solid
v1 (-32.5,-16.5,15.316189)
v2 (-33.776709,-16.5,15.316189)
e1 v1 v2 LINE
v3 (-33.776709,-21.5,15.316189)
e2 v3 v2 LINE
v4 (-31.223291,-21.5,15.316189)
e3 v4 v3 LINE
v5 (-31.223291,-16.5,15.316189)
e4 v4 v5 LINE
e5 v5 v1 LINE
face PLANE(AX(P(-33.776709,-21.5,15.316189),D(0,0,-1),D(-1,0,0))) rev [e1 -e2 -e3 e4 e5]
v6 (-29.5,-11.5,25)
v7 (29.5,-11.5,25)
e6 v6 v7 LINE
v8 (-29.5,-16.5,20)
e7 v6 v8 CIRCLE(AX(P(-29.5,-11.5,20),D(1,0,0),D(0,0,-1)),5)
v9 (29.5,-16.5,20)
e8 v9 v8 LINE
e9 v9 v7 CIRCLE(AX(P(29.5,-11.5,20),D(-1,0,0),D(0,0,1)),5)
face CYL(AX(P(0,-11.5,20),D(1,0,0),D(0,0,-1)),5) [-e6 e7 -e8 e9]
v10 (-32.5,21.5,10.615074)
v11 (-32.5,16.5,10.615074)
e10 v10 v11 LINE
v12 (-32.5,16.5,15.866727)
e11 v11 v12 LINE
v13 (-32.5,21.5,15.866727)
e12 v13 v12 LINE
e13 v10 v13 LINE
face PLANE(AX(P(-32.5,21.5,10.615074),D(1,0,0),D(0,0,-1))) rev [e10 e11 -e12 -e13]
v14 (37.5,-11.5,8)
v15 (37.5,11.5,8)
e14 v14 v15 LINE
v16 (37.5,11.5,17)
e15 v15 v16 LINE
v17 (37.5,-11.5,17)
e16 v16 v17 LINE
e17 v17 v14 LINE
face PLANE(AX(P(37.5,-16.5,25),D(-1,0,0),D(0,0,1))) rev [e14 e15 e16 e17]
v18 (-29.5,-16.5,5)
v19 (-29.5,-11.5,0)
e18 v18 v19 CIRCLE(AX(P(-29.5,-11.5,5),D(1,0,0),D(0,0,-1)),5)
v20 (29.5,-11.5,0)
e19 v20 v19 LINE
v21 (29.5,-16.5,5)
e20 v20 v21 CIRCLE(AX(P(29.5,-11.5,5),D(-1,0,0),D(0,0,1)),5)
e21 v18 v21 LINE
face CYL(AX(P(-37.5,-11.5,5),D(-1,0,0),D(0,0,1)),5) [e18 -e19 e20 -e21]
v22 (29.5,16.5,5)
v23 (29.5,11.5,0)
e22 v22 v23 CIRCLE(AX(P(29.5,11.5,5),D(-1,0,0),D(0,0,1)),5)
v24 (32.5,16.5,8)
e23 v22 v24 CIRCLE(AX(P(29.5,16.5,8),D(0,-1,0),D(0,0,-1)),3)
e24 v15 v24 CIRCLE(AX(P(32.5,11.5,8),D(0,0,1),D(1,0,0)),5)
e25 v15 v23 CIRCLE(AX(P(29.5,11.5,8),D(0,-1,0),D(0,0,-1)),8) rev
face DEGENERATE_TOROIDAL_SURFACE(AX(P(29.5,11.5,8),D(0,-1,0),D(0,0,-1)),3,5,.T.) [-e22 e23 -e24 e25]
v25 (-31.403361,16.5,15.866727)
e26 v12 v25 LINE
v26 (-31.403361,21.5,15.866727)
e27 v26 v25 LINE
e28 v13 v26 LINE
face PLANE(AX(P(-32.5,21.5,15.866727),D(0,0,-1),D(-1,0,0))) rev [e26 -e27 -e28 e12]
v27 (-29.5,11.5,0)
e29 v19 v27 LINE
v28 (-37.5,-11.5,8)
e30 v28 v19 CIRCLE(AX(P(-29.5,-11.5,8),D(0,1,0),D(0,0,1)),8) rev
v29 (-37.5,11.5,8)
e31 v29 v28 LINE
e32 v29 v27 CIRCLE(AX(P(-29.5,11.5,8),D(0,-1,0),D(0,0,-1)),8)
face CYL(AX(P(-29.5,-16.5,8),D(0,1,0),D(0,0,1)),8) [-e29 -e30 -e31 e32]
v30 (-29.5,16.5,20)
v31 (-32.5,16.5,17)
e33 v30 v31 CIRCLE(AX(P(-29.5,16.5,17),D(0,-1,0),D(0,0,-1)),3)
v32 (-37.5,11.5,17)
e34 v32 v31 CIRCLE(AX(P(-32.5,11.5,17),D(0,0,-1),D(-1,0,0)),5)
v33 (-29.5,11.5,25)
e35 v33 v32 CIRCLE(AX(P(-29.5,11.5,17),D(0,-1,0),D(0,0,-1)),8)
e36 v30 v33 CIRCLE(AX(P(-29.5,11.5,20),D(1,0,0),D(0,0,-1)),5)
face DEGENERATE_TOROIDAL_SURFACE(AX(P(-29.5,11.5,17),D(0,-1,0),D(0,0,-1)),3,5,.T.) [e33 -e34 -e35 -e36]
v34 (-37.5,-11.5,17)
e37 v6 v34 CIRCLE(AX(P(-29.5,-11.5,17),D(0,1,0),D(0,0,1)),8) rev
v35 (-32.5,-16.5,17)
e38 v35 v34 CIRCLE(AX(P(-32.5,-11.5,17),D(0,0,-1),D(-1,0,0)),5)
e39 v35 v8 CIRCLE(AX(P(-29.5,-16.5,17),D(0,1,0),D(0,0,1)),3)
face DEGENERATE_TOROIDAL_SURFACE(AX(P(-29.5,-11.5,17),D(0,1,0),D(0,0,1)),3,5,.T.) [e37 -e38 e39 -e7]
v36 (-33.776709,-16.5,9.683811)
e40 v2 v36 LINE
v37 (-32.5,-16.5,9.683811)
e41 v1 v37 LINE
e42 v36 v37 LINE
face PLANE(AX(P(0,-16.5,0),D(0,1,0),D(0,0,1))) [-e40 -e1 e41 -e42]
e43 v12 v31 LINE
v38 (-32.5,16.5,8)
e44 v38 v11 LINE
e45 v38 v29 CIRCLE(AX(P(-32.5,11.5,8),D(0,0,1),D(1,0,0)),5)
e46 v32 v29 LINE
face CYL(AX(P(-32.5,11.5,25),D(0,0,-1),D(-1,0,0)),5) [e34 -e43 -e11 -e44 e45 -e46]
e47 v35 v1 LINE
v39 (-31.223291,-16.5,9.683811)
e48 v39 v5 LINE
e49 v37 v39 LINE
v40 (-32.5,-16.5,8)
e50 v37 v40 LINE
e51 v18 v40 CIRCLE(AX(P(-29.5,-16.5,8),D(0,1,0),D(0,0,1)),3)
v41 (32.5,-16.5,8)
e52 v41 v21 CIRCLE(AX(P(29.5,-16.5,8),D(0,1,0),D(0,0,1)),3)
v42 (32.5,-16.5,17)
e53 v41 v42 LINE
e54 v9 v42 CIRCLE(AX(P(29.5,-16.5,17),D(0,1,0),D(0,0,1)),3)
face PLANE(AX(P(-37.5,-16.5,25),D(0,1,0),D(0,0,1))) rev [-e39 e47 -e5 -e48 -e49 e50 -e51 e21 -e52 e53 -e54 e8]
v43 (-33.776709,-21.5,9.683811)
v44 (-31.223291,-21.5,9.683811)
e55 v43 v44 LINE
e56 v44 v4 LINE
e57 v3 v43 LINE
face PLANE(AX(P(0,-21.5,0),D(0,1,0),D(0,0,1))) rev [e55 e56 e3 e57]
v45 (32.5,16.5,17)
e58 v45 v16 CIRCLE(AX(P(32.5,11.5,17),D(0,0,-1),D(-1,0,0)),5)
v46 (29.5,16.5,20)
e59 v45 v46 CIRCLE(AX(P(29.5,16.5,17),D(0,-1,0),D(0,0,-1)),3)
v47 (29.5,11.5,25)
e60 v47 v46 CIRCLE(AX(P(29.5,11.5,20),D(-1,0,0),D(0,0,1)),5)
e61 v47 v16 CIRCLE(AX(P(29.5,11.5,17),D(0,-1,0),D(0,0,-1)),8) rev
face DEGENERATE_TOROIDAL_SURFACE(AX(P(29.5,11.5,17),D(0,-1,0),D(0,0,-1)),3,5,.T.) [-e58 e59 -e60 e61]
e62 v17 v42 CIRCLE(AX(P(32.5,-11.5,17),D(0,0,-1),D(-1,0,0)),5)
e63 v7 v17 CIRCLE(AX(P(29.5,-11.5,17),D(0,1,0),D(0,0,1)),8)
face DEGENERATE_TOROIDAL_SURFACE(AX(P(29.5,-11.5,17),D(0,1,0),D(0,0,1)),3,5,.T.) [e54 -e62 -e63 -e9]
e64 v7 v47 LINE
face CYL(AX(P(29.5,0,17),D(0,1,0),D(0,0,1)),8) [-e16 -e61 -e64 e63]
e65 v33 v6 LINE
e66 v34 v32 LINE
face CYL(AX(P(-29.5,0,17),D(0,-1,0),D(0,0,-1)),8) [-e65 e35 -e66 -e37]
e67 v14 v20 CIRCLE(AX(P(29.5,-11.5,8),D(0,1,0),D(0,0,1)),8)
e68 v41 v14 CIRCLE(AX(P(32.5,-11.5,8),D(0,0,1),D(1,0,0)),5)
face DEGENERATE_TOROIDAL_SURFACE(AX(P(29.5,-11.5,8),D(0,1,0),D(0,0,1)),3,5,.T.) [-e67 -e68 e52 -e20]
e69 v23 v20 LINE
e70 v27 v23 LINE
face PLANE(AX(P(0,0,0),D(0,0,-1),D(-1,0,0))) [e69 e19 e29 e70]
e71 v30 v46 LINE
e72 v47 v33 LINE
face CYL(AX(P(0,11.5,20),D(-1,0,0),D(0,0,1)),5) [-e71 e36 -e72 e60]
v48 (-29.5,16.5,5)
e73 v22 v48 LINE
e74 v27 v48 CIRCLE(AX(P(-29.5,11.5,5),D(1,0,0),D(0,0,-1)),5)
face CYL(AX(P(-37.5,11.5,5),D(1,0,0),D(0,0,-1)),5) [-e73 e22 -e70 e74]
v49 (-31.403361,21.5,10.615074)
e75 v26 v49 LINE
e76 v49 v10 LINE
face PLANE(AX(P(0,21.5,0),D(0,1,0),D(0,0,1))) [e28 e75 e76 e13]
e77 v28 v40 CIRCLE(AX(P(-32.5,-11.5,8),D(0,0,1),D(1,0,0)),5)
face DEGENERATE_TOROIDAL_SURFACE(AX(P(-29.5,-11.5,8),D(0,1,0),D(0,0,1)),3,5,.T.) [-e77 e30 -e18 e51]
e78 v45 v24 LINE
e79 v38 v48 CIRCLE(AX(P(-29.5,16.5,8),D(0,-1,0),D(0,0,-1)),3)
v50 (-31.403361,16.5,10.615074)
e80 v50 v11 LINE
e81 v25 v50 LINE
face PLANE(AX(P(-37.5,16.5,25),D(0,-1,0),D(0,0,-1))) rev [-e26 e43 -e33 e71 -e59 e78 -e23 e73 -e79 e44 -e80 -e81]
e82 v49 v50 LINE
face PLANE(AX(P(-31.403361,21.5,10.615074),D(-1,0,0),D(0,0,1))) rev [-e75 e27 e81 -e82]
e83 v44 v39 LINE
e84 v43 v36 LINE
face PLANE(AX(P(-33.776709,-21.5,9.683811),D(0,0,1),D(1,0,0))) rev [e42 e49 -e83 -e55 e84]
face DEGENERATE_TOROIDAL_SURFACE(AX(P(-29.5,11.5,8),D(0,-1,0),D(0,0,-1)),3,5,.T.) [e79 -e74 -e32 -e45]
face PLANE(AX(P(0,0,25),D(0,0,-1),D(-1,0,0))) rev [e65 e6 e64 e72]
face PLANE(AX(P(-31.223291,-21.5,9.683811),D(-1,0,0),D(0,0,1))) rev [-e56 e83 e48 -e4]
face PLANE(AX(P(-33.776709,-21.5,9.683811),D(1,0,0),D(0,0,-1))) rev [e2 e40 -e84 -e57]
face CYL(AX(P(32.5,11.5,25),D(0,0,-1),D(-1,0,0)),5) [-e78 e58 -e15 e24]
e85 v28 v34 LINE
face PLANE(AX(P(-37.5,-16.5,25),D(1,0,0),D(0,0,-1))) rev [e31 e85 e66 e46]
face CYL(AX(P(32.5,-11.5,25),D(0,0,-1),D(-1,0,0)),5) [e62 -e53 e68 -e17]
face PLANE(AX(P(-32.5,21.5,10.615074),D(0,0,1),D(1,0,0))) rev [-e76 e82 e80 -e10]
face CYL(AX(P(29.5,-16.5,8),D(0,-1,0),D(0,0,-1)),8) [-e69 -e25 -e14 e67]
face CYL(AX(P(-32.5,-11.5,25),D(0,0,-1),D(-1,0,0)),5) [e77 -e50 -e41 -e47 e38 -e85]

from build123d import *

# Parameters (mm, degrees)
SKETCH1_W           = 75
SKETCH1_H           = 33
BOSS_EXTRUDE1_DEPTH = 25
FILLET1_R           = 5
FILLET2_R           = 8
SKETCH2_W           = 2.553418492
SKETCH2_H           = 5.632377872
BOSS_EXTRUDE2_DEPTH = 5
SKETCH3_W           = 1.096638537
SKETCH3_H           = 5.251652717
BOSS_EXTRUDE3_DEPTH = 5


with BuildPart() as part:
    # Sketch1 → Boss-Extrude1 (new body)
    with BuildSketch(Plane.XY):
        Rectangle(SKETCH1_W, SKETCH1_H)
    extrude(amount=BOSS_EXTRUDE1_DEPTH)

    # Fillet1
    fillet1_edges = [part.edges().sort_by_distance(p)[0] for p in [
        (0, -16.5, 25),
        (0, -16.5, 0),
        (0, 16.5, 0),
        (0, 16.5, 25),
        (37.5, -16.5, 12.5),
        (-37.5, -16.5, 12.5),
        (-37.5, 16.5, 12.5),
        (37.5, 16.5, 12.5),
    ]]
    fillet(fillet1_edges, radius=FILLET1_R)

    # Fillet2
    # the kernel refuses this fillet: 8 mm, written as the material it takes off along each edge
    with BuildSketch(Plane(origin=(-29.5, 16.5, 17), x_dir=(-1, 0, 0), z_dir=(0, 0, -1))) as fillet2_piece_1:
        with BuildLine():
            CenterArc((3, -5), 5, 0, 90)
            Line((8, -5), (8, 0))
            Line((8, 0), (3, 0))
        make_face()
    revolve(axis=Axis((-29.5, 16.5, 17), (0, 1, 0)), revolution_arc=90, mode=Mode.SUBTRACT)
    with BuildSketch(Plane(origin=(-29.5, 16.5, 8), x_dir=(0, 0, -1), z_dir=(1, 0, 0))) as fillet2_piece_2:
        with BuildLine():
            CenterArc((3, -5), 5, 0, 90)
            Line((8, -5), (8, 0))
            Line((8, 0), (3, 0))
        make_face()
    revolve(axis=Axis((-29.5, 16.5, 8), (0, 1, 0)), revolution_arc=90, mode=Mode.SUBTRACT)
    with BuildSketch(Plane(origin=(29.5, 16.5, 17), x_dir=(0, 0, 1), z_dir=(-1, 0, 0))) as fillet2_piece_3:
        with BuildLine():
            CenterArc((3, -5), 5, 0, 90)
            Line((8, -5), (8, 0))
            Line((8, 0), (3, 0))
        make_face()
    revolve(axis=Axis((29.5, 16.5, 17), (0, 1, 0)), revolution_arc=90, mode=Mode.SUBTRACT)
    with BuildSketch(Plane(origin=(29.5, 16.5, 8), x_dir=(1, 0, 0), z_dir=(0, 0, 1))) as fillet2_piece_4:
        with BuildLine():
            CenterArc((3, -5), 5, 0, 90)
            Line((8, -5), (8, 0))
            Line((8, 0), (3, 0))
        make_face()
    revolve(axis=Axis((29.5, 16.5, 8), (0, 1, 0)), revolution_arc=90, mode=Mode.SUBTRACT)
    with BuildSketch(Plane(origin=(-29.5, -16.5, 17), x_dir=(0, 0, 1), z_dir=(1, 0, 0))) as fillet2_piece_5:
        with BuildLine():
            CenterArc((3, -5), 5, 0, 90)
            Line((8, -5), (8, 0))
            Line((8, 0), (3, 0))
        make_face()
    revolve(axis=Axis((-29.5, -16.5, 17), (0, -1, 0)), revolution_arc=90, mode=Mode.SUBTRACT)
    with BuildSketch(Plane(origin=(-29.5, -16.5, 8), x_dir=(-1, 0, 0), z_dir=(0, 0, 1))) as fillet2_piece_6:
        with BuildLine():
            CenterArc((3, -5), 5, 0, 90)
            Line((8, -5), (8, 0))
            Line((8, 0), (3, 0))
        make_face()
    revolve(axis=Axis((-29.5, -16.5, 8), (0, -1, 0)), revolution_arc=90, mode=Mode.SUBTRACT)
    with BuildSketch(Plane(origin=(29.5, -16.5, 17), x_dir=(1, 0, 0), z_dir=(0, 0, -1))) as fillet2_piece_7:
        with BuildLine():
            CenterArc((3, -5), 5, 0, 90)
            Line((8, -5), (8, 0))
            Line((8, 0), (3, 0))
        make_face()
    revolve(axis=Axis((29.5, -16.5, 17), (0, -1, 0)), revolution_arc=90, mode=Mode.SUBTRACT)
    with BuildSketch(Plane(origin=(29.5, -16.5, 8), x_dir=(0, 0, -1), z_dir=(-1, 0, 0))) as fillet2_piece_8:
        with BuildLine():
            CenterArc((3, -5), 5, 0, 90)
            Line((8, -5), (8, 0))
            Line((8, 0), (3, 0))
        make_face()
    revolve(axis=Axis((29.5, -16.5, 8), (0, -1, 0)), revolution_arc=90, mode=Mode.SUBTRACT)
    with BuildSketch(Plane(origin=(37.5, -16.5, 0), x_dir=(0, 0, 1), z_dir=(0, 1, 0)), Plane(origin=(37.5, -16.5, 25), x_dir=(-1, 0, 0), z_dir=(0, 1, 0)), Plane(origin=(-37.5, 16.5, 0), x_dir=(0, 0, 1), z_dir=(0, -1, 0)), Plane(origin=(-37.5, 16.5, 25), x_dir=(1, 0, 0), z_dir=(0, -1, 0))) as fillet2_piece_9:
        with BuildLine():
            CenterArc((FILLET2_R, -FILLET2_R), FILLET2_R, 90, 90)
            Line((0, -FILLET2_R), (0, 0))
            Line((0, 0), (FILLET2_R, 0))
        make_face()
    extrude(amount=33, mode=Mode.SUBTRACT)

    # Sketch2 → Boss-Extrude2 (add)
    with BuildSketch(Plane.XZ.offset(16.5)):
        with Locations((-32.5, 12.5)):
            Rectangle(SKETCH2_W, SKETCH2_H)
    extrude(amount=BOSS_EXTRUDE2_DEPTH)

    # Sketch3 → Boss-Extrude3 (add)
    with BuildSketch(Plane(origin=(0, 16.5, 0), x_dir=(1, 0, 0), z_dir=(0, 1, 0))):
        with Locations((-31.951680732, -13.240900807)):
            Rectangle(SKETCH3_W, SKETCH3_H)
    extrude(amount=BOSS_EXTRUDE3_DEPTH)


solid = part.part
